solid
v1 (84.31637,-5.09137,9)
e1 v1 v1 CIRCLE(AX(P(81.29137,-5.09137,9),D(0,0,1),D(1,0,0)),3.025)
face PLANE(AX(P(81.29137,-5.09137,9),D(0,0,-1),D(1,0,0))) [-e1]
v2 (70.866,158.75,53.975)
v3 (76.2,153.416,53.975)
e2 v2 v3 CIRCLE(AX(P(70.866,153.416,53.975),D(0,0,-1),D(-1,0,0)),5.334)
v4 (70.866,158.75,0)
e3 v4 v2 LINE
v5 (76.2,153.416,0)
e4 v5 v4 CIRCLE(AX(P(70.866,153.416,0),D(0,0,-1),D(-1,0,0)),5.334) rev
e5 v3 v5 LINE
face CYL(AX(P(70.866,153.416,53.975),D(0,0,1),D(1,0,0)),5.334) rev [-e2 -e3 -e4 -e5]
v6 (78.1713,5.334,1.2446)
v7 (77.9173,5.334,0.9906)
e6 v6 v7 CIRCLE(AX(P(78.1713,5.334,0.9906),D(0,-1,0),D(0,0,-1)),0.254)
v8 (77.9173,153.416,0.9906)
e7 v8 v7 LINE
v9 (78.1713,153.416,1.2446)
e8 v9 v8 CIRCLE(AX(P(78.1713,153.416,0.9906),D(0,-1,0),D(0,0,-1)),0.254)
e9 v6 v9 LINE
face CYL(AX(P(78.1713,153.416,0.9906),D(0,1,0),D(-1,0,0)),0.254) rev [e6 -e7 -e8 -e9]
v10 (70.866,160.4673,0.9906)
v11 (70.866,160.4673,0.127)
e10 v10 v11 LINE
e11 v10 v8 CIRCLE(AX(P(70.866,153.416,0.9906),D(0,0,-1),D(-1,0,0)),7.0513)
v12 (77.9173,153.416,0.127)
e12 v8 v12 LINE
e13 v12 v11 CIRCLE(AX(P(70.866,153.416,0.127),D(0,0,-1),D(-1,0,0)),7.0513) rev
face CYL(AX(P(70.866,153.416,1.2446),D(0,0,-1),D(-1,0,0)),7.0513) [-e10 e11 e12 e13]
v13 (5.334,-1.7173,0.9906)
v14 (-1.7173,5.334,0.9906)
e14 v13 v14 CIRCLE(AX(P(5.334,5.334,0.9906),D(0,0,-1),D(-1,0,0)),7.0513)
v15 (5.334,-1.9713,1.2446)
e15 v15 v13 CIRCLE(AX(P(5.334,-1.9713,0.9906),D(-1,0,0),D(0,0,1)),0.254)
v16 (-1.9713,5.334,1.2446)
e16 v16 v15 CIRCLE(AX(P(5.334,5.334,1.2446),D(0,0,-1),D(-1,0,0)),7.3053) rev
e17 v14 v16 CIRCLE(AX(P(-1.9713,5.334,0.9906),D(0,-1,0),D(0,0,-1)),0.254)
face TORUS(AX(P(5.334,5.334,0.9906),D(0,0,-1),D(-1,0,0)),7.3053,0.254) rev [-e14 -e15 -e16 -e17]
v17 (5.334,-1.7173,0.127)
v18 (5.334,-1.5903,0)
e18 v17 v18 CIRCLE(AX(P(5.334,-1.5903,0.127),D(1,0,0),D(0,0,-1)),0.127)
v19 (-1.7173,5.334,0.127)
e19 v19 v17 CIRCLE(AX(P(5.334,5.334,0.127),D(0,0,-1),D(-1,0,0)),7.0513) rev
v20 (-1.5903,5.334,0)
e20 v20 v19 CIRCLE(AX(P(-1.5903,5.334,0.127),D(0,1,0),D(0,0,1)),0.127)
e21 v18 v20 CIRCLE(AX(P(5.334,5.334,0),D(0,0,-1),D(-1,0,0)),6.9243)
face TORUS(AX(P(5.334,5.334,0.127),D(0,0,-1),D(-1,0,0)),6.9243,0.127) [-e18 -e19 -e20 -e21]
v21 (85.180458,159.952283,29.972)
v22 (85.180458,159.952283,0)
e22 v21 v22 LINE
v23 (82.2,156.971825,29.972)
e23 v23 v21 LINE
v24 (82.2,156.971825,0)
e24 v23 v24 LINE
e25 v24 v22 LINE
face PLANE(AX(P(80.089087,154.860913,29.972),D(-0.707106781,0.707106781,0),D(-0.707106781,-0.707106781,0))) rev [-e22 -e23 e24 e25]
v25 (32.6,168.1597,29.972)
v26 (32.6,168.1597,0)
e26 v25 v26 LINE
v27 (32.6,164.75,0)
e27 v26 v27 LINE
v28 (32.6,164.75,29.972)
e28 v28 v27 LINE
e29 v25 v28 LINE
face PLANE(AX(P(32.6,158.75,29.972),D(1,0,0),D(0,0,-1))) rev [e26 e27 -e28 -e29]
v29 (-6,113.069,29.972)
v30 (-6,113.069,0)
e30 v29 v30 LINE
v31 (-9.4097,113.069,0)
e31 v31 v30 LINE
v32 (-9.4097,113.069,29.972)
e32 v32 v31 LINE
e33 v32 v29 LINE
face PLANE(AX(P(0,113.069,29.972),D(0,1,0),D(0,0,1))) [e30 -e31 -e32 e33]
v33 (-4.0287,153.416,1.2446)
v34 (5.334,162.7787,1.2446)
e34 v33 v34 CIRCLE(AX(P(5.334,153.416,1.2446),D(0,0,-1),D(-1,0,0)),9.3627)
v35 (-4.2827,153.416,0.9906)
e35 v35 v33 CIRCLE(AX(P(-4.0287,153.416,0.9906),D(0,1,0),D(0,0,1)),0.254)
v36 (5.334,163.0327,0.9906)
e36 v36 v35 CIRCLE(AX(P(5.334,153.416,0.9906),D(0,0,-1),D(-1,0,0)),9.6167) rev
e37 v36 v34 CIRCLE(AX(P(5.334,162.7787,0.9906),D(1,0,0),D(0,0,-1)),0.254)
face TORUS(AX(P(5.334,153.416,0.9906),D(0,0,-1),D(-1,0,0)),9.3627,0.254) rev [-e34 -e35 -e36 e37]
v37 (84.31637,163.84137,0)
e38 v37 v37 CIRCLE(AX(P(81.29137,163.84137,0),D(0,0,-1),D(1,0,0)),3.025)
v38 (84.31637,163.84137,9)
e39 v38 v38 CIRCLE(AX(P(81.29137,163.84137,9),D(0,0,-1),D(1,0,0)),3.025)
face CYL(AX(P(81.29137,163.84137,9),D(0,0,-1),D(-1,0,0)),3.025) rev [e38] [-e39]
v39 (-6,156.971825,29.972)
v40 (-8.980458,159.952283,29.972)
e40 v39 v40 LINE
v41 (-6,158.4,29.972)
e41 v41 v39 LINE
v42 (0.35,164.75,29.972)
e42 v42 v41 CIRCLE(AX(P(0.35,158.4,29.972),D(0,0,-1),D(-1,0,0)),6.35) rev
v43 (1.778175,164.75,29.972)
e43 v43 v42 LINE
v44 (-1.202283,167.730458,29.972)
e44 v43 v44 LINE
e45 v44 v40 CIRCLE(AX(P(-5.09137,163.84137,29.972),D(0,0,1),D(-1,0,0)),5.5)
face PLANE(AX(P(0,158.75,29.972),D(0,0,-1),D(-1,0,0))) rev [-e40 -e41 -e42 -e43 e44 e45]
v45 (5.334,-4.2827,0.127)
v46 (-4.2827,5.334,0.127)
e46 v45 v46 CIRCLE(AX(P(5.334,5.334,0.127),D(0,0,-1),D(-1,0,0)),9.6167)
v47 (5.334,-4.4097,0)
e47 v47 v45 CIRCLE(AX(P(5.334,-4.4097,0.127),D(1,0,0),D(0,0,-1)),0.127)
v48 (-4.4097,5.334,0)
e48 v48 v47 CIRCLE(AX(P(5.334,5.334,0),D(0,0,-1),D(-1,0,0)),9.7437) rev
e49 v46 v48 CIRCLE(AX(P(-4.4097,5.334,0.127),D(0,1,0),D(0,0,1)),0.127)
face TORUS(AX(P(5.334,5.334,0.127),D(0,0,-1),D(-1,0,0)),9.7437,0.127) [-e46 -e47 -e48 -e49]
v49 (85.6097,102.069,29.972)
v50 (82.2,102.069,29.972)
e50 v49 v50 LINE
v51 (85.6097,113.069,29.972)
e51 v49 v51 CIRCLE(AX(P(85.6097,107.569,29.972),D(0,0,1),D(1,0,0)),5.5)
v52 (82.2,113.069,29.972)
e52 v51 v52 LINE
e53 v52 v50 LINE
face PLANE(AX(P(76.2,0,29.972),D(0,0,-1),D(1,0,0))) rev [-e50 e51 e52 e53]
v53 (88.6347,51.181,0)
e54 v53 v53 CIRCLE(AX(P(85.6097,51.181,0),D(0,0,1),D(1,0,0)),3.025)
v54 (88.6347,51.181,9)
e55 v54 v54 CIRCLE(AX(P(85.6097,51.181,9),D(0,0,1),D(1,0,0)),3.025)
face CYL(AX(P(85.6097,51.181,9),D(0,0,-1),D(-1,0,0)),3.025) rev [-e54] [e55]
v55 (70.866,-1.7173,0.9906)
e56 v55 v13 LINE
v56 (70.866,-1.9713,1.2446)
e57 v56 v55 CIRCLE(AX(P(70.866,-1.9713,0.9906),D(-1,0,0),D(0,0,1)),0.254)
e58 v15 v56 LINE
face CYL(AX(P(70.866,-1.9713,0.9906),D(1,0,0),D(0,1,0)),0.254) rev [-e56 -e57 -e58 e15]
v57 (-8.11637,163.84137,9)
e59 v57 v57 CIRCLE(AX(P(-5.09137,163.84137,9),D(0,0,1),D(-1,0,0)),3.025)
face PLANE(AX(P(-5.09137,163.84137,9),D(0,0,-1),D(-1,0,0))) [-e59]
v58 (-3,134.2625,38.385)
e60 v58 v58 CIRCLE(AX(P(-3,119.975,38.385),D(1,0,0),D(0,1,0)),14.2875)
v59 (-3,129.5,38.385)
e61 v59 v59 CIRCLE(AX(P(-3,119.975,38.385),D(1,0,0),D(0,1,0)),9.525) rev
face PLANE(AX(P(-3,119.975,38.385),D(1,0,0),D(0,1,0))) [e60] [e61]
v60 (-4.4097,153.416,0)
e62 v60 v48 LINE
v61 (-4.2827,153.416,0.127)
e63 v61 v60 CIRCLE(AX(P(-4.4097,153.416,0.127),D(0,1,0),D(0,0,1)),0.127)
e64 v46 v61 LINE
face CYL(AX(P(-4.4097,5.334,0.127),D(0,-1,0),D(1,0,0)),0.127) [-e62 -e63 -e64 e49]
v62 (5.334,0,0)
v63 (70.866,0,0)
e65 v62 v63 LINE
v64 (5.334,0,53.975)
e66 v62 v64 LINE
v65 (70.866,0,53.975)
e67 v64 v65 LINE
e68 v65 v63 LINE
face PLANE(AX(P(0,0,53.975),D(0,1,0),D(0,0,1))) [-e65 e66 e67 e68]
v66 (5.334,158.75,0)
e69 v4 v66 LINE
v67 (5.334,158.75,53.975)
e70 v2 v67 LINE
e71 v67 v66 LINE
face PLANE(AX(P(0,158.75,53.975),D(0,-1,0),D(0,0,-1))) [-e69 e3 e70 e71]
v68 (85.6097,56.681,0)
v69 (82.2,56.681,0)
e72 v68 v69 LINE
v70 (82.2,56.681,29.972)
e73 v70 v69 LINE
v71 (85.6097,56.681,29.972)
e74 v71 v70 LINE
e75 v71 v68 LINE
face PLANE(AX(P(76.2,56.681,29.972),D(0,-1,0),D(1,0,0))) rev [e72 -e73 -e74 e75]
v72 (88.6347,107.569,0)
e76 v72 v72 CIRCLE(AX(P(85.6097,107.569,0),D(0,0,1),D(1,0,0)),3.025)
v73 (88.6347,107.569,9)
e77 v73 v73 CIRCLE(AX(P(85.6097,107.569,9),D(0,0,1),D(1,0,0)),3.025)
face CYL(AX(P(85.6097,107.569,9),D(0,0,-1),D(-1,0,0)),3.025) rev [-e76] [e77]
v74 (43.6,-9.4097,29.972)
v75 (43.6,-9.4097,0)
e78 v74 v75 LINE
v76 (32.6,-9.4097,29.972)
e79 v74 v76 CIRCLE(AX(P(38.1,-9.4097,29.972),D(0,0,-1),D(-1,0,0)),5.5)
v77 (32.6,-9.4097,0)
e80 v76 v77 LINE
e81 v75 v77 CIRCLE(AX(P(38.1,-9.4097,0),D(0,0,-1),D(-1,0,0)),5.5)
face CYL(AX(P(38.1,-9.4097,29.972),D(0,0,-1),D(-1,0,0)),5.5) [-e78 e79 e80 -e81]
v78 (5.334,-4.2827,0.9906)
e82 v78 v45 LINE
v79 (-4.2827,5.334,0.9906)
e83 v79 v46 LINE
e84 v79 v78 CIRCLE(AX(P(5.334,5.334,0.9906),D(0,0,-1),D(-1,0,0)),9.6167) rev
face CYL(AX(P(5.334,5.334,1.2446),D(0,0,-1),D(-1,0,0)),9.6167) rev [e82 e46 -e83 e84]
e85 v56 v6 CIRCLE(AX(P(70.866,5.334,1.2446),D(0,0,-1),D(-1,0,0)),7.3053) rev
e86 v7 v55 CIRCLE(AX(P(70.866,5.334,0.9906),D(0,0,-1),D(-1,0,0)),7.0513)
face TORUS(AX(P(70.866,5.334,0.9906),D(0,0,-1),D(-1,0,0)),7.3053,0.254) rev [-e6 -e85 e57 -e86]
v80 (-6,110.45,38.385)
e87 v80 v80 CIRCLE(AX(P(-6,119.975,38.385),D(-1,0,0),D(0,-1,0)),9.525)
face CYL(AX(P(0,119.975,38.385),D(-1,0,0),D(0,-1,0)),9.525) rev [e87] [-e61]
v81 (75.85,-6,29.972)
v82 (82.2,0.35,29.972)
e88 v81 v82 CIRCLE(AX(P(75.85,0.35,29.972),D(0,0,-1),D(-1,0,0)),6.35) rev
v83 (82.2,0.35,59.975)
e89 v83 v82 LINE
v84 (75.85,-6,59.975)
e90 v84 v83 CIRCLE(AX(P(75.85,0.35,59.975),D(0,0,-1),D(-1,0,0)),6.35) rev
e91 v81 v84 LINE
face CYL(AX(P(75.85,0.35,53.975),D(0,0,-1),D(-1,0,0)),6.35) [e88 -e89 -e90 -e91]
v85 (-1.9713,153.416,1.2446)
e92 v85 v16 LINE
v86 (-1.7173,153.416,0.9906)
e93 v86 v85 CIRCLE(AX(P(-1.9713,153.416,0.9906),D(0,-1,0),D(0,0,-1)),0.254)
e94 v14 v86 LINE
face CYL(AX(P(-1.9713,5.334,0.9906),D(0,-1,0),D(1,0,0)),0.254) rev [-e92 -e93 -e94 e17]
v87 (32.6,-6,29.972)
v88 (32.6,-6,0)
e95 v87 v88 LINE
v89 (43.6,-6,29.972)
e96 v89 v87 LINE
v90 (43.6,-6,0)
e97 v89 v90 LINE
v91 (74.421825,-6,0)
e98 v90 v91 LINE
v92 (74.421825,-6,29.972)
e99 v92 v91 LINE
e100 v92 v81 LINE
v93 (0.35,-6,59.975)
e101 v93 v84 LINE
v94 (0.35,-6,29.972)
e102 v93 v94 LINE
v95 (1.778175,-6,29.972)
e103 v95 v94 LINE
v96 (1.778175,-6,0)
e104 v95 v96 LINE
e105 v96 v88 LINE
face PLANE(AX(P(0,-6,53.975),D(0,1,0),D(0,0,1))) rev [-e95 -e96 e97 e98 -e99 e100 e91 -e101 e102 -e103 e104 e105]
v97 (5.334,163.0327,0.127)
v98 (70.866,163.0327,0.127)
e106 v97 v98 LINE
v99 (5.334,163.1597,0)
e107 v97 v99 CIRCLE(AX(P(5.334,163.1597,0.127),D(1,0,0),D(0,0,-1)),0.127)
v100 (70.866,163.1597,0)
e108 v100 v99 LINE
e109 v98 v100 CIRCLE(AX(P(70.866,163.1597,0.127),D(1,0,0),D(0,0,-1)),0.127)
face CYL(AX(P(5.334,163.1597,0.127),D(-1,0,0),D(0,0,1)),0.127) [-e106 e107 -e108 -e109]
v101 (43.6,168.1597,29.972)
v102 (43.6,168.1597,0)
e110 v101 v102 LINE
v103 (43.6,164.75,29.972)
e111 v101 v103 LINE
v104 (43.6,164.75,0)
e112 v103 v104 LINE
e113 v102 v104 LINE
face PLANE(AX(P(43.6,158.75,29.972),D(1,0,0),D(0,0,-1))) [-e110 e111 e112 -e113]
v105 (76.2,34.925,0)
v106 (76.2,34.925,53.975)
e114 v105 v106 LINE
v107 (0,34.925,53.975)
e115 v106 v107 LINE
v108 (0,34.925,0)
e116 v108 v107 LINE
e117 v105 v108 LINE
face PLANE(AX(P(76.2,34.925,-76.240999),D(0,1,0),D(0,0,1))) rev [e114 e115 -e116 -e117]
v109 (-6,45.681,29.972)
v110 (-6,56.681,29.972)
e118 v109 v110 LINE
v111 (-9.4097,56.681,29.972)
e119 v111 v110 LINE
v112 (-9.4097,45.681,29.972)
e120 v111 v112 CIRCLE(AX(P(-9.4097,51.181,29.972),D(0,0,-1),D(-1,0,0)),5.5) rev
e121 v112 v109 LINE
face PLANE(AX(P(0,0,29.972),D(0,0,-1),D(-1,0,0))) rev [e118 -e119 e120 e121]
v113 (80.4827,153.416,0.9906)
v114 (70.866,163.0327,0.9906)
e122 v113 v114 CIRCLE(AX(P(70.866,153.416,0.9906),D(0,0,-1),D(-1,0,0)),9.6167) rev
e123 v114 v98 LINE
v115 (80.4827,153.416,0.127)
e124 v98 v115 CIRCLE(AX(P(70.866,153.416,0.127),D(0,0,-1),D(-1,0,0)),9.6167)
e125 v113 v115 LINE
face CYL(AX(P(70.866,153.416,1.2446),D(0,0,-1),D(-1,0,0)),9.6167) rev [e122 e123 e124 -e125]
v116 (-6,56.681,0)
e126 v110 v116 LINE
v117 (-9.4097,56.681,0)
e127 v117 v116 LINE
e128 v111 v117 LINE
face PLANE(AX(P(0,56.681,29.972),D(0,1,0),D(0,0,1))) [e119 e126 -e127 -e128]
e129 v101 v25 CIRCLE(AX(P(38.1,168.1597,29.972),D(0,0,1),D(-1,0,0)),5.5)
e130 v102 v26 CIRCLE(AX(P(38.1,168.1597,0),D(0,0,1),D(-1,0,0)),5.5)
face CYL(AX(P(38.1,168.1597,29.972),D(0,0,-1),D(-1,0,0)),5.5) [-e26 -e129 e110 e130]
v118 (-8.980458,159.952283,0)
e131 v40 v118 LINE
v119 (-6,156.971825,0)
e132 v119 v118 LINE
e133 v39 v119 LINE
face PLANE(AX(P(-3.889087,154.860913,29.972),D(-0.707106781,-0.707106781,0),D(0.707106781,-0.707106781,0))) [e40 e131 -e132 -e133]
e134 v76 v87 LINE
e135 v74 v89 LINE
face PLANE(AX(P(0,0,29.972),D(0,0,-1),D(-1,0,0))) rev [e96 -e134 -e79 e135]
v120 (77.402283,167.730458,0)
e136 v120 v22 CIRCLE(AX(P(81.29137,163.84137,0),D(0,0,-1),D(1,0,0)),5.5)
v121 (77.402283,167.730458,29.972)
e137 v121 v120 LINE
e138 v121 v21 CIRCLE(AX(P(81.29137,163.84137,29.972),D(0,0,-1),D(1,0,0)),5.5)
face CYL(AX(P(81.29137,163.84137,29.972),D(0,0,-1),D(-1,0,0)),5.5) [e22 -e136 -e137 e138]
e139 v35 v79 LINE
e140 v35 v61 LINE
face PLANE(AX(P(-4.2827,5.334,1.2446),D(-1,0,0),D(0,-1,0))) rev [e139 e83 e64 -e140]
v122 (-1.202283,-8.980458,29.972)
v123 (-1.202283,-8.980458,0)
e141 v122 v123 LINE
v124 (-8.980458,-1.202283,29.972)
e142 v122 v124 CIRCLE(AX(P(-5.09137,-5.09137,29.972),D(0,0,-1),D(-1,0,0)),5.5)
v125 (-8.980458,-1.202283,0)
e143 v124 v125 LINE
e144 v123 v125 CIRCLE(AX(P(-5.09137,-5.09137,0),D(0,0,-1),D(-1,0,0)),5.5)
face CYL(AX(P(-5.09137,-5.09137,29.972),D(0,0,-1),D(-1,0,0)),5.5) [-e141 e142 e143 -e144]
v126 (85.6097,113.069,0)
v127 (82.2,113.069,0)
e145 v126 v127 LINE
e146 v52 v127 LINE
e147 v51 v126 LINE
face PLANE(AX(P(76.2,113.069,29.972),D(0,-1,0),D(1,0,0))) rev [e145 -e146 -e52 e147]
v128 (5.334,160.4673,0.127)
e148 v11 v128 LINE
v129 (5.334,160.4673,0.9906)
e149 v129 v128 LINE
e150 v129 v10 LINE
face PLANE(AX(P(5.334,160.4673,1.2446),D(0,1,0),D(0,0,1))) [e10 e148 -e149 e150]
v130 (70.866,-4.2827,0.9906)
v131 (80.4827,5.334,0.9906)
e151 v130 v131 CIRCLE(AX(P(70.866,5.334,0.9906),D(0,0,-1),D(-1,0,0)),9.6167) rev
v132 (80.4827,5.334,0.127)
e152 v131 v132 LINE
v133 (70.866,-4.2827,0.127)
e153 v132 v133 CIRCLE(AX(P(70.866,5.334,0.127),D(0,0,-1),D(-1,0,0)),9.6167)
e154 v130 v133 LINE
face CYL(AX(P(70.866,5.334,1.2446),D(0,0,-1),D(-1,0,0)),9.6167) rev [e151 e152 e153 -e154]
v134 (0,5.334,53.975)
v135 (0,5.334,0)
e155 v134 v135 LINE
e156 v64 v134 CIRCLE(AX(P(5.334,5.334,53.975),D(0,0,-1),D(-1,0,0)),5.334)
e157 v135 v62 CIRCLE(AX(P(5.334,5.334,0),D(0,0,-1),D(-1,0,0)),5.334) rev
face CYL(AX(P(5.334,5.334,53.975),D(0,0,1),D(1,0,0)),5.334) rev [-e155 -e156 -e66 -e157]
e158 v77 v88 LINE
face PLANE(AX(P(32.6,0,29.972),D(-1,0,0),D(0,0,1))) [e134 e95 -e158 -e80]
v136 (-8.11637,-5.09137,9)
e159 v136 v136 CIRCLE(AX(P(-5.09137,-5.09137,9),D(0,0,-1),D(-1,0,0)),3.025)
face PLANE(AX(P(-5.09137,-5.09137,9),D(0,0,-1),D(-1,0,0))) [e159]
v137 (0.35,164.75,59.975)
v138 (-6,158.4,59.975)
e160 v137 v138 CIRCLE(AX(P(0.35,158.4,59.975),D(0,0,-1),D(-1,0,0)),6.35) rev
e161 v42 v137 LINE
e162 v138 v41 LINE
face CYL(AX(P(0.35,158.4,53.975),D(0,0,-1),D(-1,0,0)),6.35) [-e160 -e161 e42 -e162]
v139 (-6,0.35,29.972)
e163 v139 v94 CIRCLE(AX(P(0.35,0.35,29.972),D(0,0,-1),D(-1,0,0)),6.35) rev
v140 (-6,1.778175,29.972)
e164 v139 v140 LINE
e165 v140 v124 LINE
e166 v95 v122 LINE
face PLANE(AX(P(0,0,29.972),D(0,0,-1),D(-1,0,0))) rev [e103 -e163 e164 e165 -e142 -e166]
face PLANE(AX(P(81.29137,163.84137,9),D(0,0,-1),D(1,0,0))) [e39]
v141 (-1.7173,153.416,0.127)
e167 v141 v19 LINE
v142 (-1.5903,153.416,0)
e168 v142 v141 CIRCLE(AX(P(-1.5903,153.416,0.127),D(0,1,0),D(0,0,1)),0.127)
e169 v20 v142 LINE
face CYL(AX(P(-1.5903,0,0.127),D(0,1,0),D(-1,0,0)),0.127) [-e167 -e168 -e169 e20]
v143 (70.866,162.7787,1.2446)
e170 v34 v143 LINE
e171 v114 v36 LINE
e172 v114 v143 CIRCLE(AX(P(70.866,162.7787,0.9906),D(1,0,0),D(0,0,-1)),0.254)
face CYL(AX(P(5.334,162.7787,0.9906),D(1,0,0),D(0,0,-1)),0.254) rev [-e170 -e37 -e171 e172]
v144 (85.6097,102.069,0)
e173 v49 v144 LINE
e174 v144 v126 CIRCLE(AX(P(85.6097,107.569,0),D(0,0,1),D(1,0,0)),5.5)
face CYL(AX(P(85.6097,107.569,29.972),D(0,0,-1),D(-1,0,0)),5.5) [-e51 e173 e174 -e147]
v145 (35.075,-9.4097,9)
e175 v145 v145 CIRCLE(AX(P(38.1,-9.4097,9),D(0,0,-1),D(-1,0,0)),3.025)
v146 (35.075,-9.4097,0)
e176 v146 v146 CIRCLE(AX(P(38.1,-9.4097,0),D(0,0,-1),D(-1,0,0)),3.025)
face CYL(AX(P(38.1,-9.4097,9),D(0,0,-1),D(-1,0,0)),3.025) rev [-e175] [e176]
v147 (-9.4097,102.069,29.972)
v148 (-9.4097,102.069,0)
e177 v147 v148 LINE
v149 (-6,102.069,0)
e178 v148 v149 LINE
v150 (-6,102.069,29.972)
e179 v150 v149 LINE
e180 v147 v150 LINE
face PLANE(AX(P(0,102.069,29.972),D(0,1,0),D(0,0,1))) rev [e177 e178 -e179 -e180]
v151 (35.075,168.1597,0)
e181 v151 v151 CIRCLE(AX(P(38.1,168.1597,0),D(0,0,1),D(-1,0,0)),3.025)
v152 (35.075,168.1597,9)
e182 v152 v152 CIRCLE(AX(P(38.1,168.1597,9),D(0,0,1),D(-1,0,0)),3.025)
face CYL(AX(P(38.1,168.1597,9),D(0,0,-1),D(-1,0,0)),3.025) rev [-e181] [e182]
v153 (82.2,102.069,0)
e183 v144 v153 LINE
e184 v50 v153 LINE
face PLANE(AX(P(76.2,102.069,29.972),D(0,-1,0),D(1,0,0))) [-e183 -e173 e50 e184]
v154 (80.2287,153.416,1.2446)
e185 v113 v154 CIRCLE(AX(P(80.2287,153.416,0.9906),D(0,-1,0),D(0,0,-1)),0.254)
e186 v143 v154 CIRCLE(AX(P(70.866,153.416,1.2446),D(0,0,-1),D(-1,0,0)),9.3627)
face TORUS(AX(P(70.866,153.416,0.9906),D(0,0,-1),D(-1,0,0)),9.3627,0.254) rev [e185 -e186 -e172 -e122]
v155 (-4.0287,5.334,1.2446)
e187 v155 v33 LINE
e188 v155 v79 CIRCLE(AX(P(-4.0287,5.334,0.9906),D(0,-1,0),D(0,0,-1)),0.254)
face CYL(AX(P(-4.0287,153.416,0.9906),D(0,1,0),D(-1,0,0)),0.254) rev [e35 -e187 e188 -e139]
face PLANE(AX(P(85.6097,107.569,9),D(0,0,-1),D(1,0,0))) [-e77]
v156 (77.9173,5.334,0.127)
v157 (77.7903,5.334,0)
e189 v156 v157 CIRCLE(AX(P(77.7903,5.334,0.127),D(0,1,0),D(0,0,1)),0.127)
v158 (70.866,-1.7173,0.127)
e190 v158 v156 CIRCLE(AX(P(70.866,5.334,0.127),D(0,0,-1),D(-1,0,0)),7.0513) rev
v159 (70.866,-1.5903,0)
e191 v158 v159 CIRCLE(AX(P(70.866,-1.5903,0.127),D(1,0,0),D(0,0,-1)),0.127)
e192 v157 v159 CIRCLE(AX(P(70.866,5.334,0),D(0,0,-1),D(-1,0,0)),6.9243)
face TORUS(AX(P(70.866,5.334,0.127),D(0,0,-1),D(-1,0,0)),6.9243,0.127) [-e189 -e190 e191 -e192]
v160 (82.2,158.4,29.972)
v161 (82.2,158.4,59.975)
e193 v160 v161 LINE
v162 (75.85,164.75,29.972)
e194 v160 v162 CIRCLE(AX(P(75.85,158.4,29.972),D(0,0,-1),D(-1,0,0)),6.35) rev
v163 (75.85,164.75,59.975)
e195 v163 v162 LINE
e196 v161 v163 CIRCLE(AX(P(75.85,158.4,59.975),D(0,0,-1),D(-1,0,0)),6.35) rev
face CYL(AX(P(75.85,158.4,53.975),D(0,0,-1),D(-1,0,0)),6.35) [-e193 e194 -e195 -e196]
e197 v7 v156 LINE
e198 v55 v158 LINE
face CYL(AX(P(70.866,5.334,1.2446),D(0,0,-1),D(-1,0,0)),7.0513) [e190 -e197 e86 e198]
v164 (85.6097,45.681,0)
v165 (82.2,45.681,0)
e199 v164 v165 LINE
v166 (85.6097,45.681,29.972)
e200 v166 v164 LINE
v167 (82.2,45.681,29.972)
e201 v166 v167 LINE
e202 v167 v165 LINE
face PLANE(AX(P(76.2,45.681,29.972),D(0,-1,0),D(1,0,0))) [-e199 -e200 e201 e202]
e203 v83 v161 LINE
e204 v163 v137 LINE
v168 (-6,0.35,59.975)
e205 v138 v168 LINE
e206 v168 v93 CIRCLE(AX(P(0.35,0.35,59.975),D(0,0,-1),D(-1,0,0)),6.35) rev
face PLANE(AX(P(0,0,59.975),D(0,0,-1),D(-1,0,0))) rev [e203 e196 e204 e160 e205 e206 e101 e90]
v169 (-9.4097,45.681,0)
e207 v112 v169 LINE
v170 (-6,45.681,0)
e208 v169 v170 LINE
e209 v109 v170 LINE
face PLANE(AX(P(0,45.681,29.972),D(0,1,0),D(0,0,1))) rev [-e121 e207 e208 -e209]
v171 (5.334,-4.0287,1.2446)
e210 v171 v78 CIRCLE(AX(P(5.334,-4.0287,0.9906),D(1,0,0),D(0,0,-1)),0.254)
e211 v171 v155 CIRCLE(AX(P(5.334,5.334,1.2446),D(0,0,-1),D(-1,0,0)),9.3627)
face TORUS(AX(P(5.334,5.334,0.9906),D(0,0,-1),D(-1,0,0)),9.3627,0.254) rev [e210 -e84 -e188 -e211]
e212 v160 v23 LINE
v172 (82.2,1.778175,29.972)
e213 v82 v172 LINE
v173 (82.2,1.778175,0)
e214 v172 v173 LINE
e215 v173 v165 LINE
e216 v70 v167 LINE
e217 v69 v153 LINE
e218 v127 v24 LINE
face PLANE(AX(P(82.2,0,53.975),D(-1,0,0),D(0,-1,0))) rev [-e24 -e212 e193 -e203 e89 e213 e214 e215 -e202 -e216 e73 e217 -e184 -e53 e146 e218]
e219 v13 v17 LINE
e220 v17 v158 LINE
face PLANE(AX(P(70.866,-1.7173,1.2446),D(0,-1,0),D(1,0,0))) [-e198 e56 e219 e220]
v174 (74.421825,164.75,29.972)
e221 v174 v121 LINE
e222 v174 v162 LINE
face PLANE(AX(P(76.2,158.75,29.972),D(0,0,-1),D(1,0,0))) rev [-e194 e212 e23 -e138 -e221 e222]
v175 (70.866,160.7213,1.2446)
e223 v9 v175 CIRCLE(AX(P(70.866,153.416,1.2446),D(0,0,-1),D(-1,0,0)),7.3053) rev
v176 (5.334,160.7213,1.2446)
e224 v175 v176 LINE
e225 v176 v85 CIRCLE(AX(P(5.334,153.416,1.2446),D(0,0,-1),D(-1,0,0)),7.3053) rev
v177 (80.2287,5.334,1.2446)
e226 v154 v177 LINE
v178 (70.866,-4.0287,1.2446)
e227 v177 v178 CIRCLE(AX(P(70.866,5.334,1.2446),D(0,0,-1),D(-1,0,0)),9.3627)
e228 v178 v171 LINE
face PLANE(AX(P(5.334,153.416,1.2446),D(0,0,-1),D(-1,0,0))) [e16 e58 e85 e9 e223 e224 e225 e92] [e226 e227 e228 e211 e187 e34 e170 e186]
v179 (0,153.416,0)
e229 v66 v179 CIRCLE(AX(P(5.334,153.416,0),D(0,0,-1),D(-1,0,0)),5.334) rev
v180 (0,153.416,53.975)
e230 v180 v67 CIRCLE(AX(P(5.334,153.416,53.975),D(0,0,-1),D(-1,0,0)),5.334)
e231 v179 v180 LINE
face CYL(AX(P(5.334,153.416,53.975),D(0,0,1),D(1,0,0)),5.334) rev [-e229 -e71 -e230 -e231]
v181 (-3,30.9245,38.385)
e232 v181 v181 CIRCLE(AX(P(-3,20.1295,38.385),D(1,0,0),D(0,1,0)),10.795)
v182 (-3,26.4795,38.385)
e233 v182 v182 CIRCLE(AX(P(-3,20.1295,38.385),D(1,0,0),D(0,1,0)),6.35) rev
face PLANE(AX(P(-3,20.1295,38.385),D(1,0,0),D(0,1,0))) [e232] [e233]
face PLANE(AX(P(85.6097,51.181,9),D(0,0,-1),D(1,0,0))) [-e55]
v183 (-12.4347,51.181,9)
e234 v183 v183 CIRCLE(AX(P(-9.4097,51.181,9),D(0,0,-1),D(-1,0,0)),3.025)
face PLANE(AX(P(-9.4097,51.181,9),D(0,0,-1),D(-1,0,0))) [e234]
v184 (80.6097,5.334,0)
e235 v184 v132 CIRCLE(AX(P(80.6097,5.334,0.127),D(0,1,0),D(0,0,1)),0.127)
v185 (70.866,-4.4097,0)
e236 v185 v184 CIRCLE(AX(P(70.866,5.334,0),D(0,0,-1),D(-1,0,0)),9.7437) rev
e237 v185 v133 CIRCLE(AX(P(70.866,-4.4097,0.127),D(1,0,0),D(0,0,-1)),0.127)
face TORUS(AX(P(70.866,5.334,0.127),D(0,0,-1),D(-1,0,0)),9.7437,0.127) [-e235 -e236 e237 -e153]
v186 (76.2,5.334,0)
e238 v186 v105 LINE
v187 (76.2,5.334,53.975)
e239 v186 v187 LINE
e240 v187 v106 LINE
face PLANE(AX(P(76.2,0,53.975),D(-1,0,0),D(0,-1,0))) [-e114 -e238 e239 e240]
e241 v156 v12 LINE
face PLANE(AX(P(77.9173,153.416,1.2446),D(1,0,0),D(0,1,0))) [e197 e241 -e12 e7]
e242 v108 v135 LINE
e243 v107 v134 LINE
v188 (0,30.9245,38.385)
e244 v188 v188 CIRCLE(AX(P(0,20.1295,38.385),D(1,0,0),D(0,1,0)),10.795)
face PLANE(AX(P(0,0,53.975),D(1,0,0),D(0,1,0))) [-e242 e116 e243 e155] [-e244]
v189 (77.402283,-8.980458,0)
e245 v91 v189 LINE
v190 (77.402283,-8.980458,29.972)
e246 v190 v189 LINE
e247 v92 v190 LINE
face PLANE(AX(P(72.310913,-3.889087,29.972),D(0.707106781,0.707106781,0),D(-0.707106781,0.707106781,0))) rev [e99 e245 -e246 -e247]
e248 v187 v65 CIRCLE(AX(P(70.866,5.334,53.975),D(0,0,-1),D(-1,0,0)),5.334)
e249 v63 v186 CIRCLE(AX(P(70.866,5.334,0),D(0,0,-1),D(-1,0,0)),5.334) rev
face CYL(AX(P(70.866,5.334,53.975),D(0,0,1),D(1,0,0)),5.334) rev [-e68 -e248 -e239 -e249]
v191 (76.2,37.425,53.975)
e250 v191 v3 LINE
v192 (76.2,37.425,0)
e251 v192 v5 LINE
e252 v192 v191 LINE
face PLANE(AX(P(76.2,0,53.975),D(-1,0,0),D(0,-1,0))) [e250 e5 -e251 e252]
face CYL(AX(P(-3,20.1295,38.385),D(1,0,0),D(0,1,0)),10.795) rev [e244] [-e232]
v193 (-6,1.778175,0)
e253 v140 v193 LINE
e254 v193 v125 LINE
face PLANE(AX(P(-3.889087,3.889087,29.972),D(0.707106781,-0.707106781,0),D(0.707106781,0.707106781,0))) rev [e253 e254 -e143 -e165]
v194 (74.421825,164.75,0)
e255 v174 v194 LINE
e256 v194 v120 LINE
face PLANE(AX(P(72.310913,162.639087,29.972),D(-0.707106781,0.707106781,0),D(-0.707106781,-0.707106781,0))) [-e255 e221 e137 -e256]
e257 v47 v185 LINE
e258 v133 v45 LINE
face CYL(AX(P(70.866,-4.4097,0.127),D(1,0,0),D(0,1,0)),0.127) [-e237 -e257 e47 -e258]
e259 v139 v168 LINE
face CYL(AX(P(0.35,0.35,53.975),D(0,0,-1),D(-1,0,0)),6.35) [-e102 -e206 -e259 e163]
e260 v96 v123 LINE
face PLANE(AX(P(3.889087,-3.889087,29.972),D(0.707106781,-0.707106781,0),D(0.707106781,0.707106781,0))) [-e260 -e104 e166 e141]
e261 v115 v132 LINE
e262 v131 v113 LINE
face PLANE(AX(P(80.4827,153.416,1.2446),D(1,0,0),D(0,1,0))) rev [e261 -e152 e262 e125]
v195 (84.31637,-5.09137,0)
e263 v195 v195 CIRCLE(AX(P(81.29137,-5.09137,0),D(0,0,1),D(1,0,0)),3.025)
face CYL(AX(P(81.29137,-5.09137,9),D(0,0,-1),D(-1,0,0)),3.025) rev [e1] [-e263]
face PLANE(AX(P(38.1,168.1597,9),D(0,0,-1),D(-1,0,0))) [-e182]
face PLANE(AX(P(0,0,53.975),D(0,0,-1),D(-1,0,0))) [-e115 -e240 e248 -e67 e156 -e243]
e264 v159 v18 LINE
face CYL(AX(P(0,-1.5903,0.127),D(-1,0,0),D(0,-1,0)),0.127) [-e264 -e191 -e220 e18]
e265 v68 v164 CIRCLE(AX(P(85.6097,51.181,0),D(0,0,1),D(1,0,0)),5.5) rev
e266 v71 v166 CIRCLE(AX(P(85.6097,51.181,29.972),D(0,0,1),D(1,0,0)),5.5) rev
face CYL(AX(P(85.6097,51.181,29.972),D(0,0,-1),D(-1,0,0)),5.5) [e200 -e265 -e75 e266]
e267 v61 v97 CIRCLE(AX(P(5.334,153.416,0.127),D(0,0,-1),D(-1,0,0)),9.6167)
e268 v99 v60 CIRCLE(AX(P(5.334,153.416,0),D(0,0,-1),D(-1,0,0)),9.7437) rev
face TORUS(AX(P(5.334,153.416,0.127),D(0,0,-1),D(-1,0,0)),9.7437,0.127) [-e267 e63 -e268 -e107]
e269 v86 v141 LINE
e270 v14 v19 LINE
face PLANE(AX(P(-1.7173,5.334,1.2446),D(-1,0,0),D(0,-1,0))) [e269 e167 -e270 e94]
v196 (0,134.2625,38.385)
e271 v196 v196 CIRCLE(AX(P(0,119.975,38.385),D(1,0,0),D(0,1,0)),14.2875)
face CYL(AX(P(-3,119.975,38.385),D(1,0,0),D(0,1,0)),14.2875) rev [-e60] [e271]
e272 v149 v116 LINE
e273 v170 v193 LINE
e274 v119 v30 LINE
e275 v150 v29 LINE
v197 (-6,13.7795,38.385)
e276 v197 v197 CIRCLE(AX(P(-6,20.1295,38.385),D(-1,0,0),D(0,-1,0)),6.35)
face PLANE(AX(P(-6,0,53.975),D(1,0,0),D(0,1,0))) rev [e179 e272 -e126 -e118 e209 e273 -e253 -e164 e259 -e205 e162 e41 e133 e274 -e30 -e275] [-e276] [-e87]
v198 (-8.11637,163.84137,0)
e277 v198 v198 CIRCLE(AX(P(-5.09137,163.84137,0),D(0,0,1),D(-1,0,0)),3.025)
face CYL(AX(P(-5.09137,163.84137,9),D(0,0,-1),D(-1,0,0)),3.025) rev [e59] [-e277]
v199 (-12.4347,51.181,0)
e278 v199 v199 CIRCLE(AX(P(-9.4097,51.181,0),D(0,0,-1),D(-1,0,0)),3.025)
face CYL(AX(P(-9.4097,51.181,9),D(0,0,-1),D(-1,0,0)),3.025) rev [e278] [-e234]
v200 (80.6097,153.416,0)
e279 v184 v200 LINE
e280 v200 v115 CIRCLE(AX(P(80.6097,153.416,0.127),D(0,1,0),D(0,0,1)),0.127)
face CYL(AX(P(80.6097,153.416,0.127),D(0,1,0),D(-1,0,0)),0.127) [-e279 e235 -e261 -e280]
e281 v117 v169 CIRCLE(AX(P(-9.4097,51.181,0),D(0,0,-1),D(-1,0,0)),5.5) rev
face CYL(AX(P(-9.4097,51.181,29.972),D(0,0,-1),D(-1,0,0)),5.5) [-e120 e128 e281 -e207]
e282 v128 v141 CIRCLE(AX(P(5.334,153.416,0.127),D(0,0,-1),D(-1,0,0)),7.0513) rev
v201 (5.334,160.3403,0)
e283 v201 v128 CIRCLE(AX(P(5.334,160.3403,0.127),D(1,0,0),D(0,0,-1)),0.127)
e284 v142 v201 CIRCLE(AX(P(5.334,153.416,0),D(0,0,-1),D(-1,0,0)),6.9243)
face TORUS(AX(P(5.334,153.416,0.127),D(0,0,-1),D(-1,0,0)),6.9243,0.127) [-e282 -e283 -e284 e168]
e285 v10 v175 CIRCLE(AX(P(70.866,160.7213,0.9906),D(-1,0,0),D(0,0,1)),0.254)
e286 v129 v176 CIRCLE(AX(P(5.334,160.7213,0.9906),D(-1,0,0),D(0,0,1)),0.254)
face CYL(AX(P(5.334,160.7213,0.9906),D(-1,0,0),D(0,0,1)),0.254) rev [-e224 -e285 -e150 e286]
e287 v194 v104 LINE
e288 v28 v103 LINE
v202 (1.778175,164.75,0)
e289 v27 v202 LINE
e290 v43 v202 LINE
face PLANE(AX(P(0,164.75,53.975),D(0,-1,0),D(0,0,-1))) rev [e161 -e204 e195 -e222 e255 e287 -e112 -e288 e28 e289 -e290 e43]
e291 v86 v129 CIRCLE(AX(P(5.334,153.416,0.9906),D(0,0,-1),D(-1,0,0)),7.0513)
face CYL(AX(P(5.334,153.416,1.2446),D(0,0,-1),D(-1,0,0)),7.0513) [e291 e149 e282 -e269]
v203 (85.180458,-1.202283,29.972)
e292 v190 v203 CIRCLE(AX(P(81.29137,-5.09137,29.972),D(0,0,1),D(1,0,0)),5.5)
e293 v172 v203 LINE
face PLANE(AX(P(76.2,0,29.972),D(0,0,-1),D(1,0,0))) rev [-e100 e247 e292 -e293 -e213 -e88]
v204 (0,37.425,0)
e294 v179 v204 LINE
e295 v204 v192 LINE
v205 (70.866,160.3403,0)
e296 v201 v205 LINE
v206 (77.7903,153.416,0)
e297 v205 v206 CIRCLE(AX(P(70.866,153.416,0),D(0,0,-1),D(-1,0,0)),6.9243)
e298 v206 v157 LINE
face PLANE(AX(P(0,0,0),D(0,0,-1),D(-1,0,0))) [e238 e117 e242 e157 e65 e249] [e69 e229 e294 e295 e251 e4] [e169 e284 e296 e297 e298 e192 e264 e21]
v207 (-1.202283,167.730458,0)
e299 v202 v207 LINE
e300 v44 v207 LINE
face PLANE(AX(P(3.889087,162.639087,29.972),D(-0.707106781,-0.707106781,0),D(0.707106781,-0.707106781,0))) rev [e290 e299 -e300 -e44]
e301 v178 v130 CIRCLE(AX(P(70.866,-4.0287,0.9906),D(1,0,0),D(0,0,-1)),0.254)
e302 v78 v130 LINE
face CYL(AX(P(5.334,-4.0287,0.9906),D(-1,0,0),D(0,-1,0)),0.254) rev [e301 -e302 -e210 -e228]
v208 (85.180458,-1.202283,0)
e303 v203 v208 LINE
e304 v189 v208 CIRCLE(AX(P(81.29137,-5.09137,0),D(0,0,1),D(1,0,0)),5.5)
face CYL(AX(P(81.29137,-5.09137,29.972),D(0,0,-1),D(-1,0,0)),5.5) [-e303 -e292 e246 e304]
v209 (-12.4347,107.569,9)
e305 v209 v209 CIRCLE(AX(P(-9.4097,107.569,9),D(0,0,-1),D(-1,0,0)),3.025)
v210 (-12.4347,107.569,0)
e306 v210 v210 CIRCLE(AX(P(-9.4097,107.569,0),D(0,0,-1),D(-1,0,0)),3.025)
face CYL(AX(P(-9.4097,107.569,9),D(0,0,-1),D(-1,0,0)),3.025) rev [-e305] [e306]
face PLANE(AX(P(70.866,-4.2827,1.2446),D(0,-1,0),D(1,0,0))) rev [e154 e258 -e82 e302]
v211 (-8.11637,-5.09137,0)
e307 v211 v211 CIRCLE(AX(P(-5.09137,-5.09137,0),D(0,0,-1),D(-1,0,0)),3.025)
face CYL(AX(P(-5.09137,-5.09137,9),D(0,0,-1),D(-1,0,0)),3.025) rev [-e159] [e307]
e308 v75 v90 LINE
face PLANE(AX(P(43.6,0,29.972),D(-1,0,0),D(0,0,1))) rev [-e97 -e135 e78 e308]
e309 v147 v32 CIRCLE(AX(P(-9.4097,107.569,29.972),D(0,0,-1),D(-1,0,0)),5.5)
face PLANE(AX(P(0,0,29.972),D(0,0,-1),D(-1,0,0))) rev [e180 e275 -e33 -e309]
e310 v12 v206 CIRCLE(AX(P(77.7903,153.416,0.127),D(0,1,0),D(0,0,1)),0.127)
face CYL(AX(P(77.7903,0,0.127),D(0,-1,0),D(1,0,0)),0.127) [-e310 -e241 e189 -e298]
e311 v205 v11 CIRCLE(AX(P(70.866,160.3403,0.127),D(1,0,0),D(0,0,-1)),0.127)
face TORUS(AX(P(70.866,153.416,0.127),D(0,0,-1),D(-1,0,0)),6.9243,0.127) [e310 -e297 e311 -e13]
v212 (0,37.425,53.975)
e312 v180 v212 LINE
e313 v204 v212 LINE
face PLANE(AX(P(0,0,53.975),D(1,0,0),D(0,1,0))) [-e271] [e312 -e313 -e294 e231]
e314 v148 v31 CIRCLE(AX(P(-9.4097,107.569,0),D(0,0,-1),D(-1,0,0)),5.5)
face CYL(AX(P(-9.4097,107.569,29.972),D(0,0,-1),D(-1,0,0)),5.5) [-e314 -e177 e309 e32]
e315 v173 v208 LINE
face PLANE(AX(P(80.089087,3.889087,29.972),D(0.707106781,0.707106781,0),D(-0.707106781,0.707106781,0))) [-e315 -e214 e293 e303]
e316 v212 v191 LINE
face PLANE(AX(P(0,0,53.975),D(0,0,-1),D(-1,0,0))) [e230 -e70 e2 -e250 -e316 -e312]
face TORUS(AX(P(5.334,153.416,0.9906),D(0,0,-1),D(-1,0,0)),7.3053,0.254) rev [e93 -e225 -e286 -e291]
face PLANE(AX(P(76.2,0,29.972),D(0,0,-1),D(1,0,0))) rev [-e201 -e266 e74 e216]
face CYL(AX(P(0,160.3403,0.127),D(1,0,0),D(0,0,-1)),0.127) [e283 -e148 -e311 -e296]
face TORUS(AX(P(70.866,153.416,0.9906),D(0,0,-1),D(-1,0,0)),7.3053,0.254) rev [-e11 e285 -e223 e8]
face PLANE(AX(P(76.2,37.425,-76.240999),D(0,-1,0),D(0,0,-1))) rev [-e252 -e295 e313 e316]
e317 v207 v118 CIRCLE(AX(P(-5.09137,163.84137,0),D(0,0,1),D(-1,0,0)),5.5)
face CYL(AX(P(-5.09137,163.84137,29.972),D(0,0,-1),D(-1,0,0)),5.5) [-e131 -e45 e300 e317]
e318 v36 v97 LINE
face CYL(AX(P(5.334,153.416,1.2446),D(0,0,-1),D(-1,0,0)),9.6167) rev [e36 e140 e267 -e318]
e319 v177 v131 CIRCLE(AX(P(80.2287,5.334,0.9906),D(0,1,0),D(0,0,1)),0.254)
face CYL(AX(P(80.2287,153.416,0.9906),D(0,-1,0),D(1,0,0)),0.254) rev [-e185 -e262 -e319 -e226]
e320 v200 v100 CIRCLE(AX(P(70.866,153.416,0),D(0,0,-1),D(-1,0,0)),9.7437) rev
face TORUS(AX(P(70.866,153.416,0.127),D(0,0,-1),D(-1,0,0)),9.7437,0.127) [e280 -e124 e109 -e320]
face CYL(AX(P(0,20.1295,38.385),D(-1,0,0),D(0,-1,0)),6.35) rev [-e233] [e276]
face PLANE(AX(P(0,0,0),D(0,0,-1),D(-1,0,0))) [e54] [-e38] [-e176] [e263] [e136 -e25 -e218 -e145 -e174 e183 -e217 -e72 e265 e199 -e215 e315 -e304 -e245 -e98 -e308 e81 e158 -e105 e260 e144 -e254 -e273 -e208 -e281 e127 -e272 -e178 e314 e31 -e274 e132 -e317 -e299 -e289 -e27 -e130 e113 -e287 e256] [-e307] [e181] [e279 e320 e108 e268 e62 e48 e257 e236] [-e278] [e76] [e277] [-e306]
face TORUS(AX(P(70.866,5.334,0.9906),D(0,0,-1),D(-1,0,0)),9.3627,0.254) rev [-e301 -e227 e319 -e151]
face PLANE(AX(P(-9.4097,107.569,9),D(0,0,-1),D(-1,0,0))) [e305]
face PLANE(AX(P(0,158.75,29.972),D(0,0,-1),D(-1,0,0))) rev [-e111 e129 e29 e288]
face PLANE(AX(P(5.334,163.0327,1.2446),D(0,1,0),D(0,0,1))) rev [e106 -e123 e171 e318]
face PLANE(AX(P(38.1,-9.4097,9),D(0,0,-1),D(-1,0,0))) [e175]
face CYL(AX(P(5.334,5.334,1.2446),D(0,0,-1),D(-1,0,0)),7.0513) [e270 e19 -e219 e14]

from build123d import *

# Parameters (mm, degrees)
SKETCH3_W               = 76.2
SKETCH3_H               = 158.75
BOSS_EXTRUDE1_DEPTH     = 53.975
SHELL1_T                = 6
FILLET1_R               = 5.334
FILLET2_R               = 6.35
CUT_EXTRUDE1_DEPTH      = 1.2446
FILLET3_R               = 0.254
FILLET4_R               = 0.127
SKETCH7_W               = 76.2
SKETCH7_H               = 2.5
BOSS_EXTRUDE2_DEPTH     = 53.975
BOSS_EXTRUDE3_DEPTH     = 29.972
SKETCH9_R               = 3.025
CUT_EXTRUDE2_DEPTH      = 9
MIRROR2_COPY_1_DEPTH    = 29.972
MIRROR2_COPY_2_SKETCH_R = 3.025
MIRROR2_COPY_2_DEPTH    = 9
BOSS_EXTRUDE4_DEPTH     = 29.972
SKETCH11_R              = 3.025
CUT_EXTRUDE3_DEPTH      = 9
BOSS_EXTRUDE5_DEPTH     = 29.972
SKETCH13_R              = 3.025
CUT_EXTRUDE4_DEPTH      = 9
SKETCH17_R              = 9.525
SKETCH17_R_2            = 6.35
CUT_EXTRUDE6_DEPTH      = 6
SKETCH18_R              = 14.2875
SKETCH18_R_2            = 10.795
CUT_EXTRUDE7_DEPTH      = 3


with BuildPart() as part:
    # Sketch3 → Boss-Extrude1 (new body)
    with BuildSketch(Plane.XY):
        with Locations((38.1, 79.375)):
            Rectangle(SKETCH3_W, SKETCH3_H)
    extrude(amount=BOSS_EXTRUDE1_DEPTH)

    # Shell1
    shell1_openings = [part.faces().sort_by_distance(p)[0] for p in [
        (38.1, 79.375, 0),
    ]]
    offset(amount=SHELL1_T, openings=shell1_openings, kind=Kind.INTERSECTION)

    # Fillet1
    # the kernel refuses this fillet: 5.334 mm, written as the material it adds along each edge
    with BuildSketch(Plane(origin=(0, 158.75, 0), x_dir=(1, 0, 0), z_dir=(0, 0, 1)), Plane(origin=(76.2, 0, 0), x_dir=(-1, 0, 0), z_dir=(0, 0, 1)), Plane(origin=(76.2, 158.75, 0), x_dir=(0, -1, 0), z_dir=(0, 0, 1))) as fillet1_piece_1:
        with BuildLine():
            CenterArc((FILLET1_R, -FILLET1_R), FILLET1_R, 90, 90)
            Line((0, -FILLET1_R), (0, 0))
            Line((0, 0), (FILLET1_R, 0))
        make_face()
    extrude(amount=53.975)
    with BuildSketch(Plane(origin=(0, 0, 0), x_dir=(1, 0, 0), z_dir=(0, 0, 1))) as fillet1_piece_2:
        with BuildLine():
            CenterArc((FILLET1_R, FILLET1_R), FILLET1_R, 180, 90)
            Line((0, FILLET1_R), (0, 0))
            Line((0, 0), (FILLET1_R, 0))
        make_face()
    extrude(amount=53.975)

    # Fillet2
    fillet2_edges = [part.edges().sort_by_distance(p)[0] for p in [
        (-6, 164.75, 29.9875),
        (82.2, 164.75, 29.9875),
        (82.2, -6, 29.9875),
        (-6, -6, 29.9875),
    ]]
    fillet(fillet2_edges, radius=FILLET2_R)

    # Sketch6 → Cut-Extrude1 (cut)
    with BuildSketch(Plane(origin=(0, 0, 0), x_dir=(-1, 0, 0), z_dir=(0, 0, -1))):
        with BuildLine():
            Line((-5.334, 163.0327), (-70.866, 163.0327))
            ThreePointArc((-70.866, 163.0327), (-77.666033783, 160.216033783), (-80.4827, 153.416))
            Line((-80.4827, 153.416), (-80.4827, 5.334))
            ThreePointArc((-80.4827, 5.334), (-77.666033783, -1.466033783), (-70.866, -4.2827))
            Line((-70.866, -4.2827), (-5.334, -4.2827))
            ThreePointArc((-5.334, -4.2827), (1.466033783, -1.466033783), (4.2827, 5.334))
            Line((4.2827, 5.334), (4.2827, 153.416))
            ThreePointArc((4.2827, 153.416), (1.466033783, 160.216033783), (-5.334, 163.0327))
        make_face()
        with BuildLine():
            Line((-77.9173, 153.416), (-77.9173, 5.334))
            ThreePointArc((-77.9173, 5.334), (-75.852022046, 0.347977954), (-70.866, -1.7173))
            Line((-70.866, -1.7173), (-5.334, -1.7173))
            ThreePointArc((-5.334, -1.7173), (-0.347977954, 0.347977954), (1.7173, 5.334))
            Line((1.7173, 5.334), (1.7173, 153.416))
            ThreePointArc((1.7173, 153.416), (-0.347977954, 158.402022046), (-5.334, 160.4673))
            Line((-5.334, 160.4673), (-70.866, 160.4673))
            ThreePointArc((-70.866, 160.4673), (-75.852022046, 158.402022046), (-77.9173, 153.416))
        make_face(mode=Mode.SUBTRACT)
    extrude(amount=-CUT_EXTRUDE1_DEPTH, mode=Mode.SUBTRACT)

    # Fillet3
    fillet3_edges = [part.edges().sort_by_distance(p)[0] for p in [
        (-1.466033783, 160.216033783, 1.2446),
        (-4.2827, 79.375, 1.2446),
        (-1.466033783, -1.466033783, 1.2446),
        (38.1, -4.2827, 1.2446),
        (77.666033783, -1.466033783, 1.2446),
        (80.4827, 79.375, 1.2446),
        (77.666033783, 160.216033783, 1.2446),
        (38.1, 163.0327, 1.2446),
        (38.1, 160.4673, 1.2446),
        (75.852022046, 158.402022046, 1.2446),
        (77.9173, 79.375, 1.2446),
        (75.852022046, 0.347977954, 1.2446),
        (38.1, -1.7173, 1.2446),
        (0.347977954, 0.347977954, 1.2446),
        (-1.7173, 79.375, 1.2446),
        (0.347977954, 158.402022046, 1.2446),
    ]]
    fillet(fillet3_edges, radius=FILLET3_R)

    # Fillet4
    fillet4_edges = [part.edges().sort_by_distance(p)[0] for p in [
        (-1.466033783, 160.216033783, 0),
        (38.1, 163.0327, 0),
        (77.666033783, 160.216033783, 0),
        (80.4827, 79.375, 0),
        (77.666033783, -1.466033783, 0),
        (38.1, -4.2827, 0),
        (-1.466033783, -1.466033783, 0),
        (-4.2827, 79.375, 0),
        (75.852022046, 158.402022046, 0),
        (38.1, 160.4673, 0),
        (0.347977954, 158.402022046, 0),
        (-1.7173, 79.375, 0),
        (0.347977954, 0.347977954, 0),
        (38.1, -1.7173, 0),
        (75.852022046, 0.347977954, 0),
        (77.9173, 79.375, 0),
    ]]
    fillet(fillet4_edges, radius=FILLET4_R)

    # Sketch7 → Boss-Extrude2 (add)
    with BuildSketch(Plane(origin=(0, 0, 53.975), x_dir=(-1, 0, 0), z_dir=(0, 0, -1))):
        with Locations((-38.1, 36.175)):
            Rectangle(SKETCH7_W, SKETCH7_H)
    extrude(amount=BOSS_EXTRUDE2_DEPTH)

    # Sketch8 → Boss-Extrude3 (add)
    with BuildSketch(Plane(origin=(0, 0, 0), x_dir=(-1, 0, 0), z_dir=(0, 0, -1))):
        with BuildLine():
            ThreePointArc((6, 0.35), (5.516635031, -2.080039796), (4.140128061, -4.140128061))
            ThreePointArc((4.140128061, -4.140128061), (2.080039796, -5.516635031), (-0.35, -6))
            Line((-0.35, -6), (-1.778174593, -6))
            Line((-1.778174593, -6), (1.202282953, -8.980457546))
            ThreePointArc((1.202282953, -8.980457546), (8.980457546, -8.980457546), (8.980457546, -1.202282953))
            Line((8.980457546, -1.202282953), (6, 1.778174593))
            Line((6, 1.778174593), (6, 0.35))
        make_face()
    boss_extrude3 = extrude(amount=-BOSS_EXTRUDE3_DEPTH)

    # Sketch9 → Cut-Extrude2 (cut)
    with BuildSketch(Plane(origin=(0, 0, 0), x_dir=(-1, 0, 0), z_dir=(0, 0, -1))):
        with Locations((5.09137025, -5.09137025)):
            Circle(SKETCH9_R)
    cut_extrude2 = extrude(amount=-CUT_EXTRUDE2_DEPTH, mode=Mode.SUBTRACT)

    # Mirror1: Boss-Extrude3, Cut-Extrude2 across plane
    add(boss_extrude3.mirror(Plane.ZY.offset(-38.1)))
    add(cut_extrude2.mirror(Plane.ZY.offset(-38.1)), mode=Mode.SUBTRACT)

    # Mirror2: Boss-Extrude3, Cut-Extrude2 across plane
    add(boss_extrude3.mirror(Plane(origin=(0, 79.375, 0), x_dir=(0, 0, 1), z_dir=(0, -1, 0))))
    add(cut_extrude2.mirror(Plane(origin=(0, 79.375, 0), x_dir=(0, 0, 1), z_dir=(0, -1, 0))), mode=Mode.SUBTRACT)

    # Mirror2 copy 1 sketch → Mirror2 copy 1 (add)
    with BuildSketch(Plane(origin=(76.2, 158.75, 0), x_dir=(1, 0, 0), z_dir=(0, 0, -1))):
        with BuildLine():
            ThreePointArc((6, 0.35), (5.516635031, -2.080039796), (4.140128061, -4.140128061))
            ThreePointArc((4.140128061, -4.140128061), (2.080039796, -5.516635031), (-0.35, -6))
            Line((-0.35, -6), (-1.778174593, -6))
            Line((-1.778174593, -6), (1.202282953, -8.980457546))
            ThreePointArc((1.202282953, -8.980457546), (8.980457546, -8.980457546), (8.980457546, -1.202282953))
            Line((8.980457546, -1.202282953), (6, 1.778174593))
            Line((6, 1.778174593), (6, 0.35))
        make_face()
    extrude(amount=-MIRROR2_COPY_1_DEPTH)

    # Mirror2 copy 2 sketch → Mirror2 copy 2 (cut)
    with BuildSketch(Plane(origin=(76.2, 158.75, 0), x_dir=(1, 0, 0), z_dir=(0, 0, -1))):
        with Locations((5.09137025, -5.09137025)):
            Circle(MIRROR2_COPY_2_SKETCH_R)
    extrude(amount=-MIRROR2_COPY_2_DEPTH, mode=Mode.SUBTRACT)

    # Sketch10 → Boss-Extrude4 (add)
    with BuildSketch(Plane(origin=(0, 0, 0), x_dir=(-1, 0, 0), z_dir=(0, 0, -1))):
        with BuildLine():
            Line((6, 102.069), (9.4097, 102.069))
            ThreePointArc((9.4097, 102.069), (14.9097, 107.569), (9.4097, 113.069))
            Line((9.4097, 113.069), (6, 113.069))
            Line((6, 113.069), (6, 102.069))
        make_face()
        with BuildLine():
            Line((9.4097, 56.681), (6, 56.681))
            Line((6, 56.681), (6, 45.681))
            Line((6, 45.681), (9.4097, 45.681))
            ThreePointArc((9.4097, 45.681), (14.9097, 51.181), (9.4097, 56.681))
        make_face()
    boss_extrude4 = extrude(amount=-BOSS_EXTRUDE4_DEPTH)

    # Sketch11 → Cut-Extrude3 (cut)
    with BuildSketch(Plane(origin=(0, 0, 0), x_dir=(-1, 0, 0), z_dir=(0, 0, -1))):
        with Locations((9.4097, 51.181)):
            Circle(SKETCH11_R)
        with Locations((9.4097, 107.569)):
            Circle(SKETCH11_R)
    cut_extrude3 = extrude(amount=-CUT_EXTRUDE3_DEPTH, mode=Mode.SUBTRACT)

    # Mirror3: Boss-Extrude4, Cut-Extrude3 across plane
    add(boss_extrude4.mirror(Plane.ZY.offset(-38.1)))
    add(cut_extrude3.mirror(Plane.ZY.offset(-38.1)), mode=Mode.SUBTRACT)

    # Sketch12 → Boss-Extrude5 (add)
    with BuildSketch(Plane(origin=(0, 0, 0), x_dir=(-1, 0, 0), z_dir=(0, 0, -1))):
        with BuildLine():
            Line((-43.6, -6), (-43.6, -9.4097))
            ThreePointArc((-43.6, -9.4097), (-38.1, -14.9097), (-32.6, -9.4097))
            Line((-32.6, -9.4097), (-32.6, -6))
            Line((-32.6, -6), (-43.6, -6))
        make_face()
    boss_extrude5 = extrude(amount=-BOSS_EXTRUDE5_DEPTH)

    # Sketch13 → Cut-Extrude4 (cut)
    with BuildSketch(Plane(origin=(0, 0, 0), x_dir=(-1, 0, 0), z_dir=(0, 0, -1))):
        with Locations((-38.1, -9.4097)):
            Circle(SKETCH13_R)
    cut_extrude4 = extrude(amount=-CUT_EXTRUDE4_DEPTH, mode=Mode.SUBTRACT)

    # Mirror4: Boss-Extrude5, Cut-Extrude4 across plane
    add(boss_extrude5.mirror(Plane(origin=(0, 79.375, 0), x_dir=(0, 0, 1), z_dir=(0, -1, 0))))
    add(cut_extrude4.mirror(Plane(origin=(0, 79.375, 0), x_dir=(0, 0, 1), z_dir=(0, -1, 0))), mode=Mode.SUBTRACT)

    # Sketch17 → Cut-Extrude6 (cut)
    with BuildSketch(Plane.ZY.offset(6)):
        with Locations(Location((38.385, 119.975, 0), (0, 0, 270))):
            Circle(SKETCH17_R)
        with Locations(Location((38.385, 20.1295, 0), (0, 0, 270))):
            Circle(SKETCH17_R_2)
    extrude(amount=-CUT_EXTRUDE6_DEPTH, mode=Mode.SUBTRACT)

    # Sketch18 → Cut-Extrude7 (cut)
    with BuildSketch(Plane(origin=(0, 0, 0), x_dir=(0, 0, -1), z_dir=(1, 0, 0))):
        with Locations(Location((-38.385, 119.975, 0), (0, 0, 90))):
            Circle(SKETCH18_R)
        with Locations(Location((-38.385, 20.1295, 0), (0, 0, 90))):
            Circle(SKETCH18_R_2)
    extrude(amount=-CUT_EXTRUDE7_DEPTH, mode=Mode.SUBTRACT)


solid = part.part
